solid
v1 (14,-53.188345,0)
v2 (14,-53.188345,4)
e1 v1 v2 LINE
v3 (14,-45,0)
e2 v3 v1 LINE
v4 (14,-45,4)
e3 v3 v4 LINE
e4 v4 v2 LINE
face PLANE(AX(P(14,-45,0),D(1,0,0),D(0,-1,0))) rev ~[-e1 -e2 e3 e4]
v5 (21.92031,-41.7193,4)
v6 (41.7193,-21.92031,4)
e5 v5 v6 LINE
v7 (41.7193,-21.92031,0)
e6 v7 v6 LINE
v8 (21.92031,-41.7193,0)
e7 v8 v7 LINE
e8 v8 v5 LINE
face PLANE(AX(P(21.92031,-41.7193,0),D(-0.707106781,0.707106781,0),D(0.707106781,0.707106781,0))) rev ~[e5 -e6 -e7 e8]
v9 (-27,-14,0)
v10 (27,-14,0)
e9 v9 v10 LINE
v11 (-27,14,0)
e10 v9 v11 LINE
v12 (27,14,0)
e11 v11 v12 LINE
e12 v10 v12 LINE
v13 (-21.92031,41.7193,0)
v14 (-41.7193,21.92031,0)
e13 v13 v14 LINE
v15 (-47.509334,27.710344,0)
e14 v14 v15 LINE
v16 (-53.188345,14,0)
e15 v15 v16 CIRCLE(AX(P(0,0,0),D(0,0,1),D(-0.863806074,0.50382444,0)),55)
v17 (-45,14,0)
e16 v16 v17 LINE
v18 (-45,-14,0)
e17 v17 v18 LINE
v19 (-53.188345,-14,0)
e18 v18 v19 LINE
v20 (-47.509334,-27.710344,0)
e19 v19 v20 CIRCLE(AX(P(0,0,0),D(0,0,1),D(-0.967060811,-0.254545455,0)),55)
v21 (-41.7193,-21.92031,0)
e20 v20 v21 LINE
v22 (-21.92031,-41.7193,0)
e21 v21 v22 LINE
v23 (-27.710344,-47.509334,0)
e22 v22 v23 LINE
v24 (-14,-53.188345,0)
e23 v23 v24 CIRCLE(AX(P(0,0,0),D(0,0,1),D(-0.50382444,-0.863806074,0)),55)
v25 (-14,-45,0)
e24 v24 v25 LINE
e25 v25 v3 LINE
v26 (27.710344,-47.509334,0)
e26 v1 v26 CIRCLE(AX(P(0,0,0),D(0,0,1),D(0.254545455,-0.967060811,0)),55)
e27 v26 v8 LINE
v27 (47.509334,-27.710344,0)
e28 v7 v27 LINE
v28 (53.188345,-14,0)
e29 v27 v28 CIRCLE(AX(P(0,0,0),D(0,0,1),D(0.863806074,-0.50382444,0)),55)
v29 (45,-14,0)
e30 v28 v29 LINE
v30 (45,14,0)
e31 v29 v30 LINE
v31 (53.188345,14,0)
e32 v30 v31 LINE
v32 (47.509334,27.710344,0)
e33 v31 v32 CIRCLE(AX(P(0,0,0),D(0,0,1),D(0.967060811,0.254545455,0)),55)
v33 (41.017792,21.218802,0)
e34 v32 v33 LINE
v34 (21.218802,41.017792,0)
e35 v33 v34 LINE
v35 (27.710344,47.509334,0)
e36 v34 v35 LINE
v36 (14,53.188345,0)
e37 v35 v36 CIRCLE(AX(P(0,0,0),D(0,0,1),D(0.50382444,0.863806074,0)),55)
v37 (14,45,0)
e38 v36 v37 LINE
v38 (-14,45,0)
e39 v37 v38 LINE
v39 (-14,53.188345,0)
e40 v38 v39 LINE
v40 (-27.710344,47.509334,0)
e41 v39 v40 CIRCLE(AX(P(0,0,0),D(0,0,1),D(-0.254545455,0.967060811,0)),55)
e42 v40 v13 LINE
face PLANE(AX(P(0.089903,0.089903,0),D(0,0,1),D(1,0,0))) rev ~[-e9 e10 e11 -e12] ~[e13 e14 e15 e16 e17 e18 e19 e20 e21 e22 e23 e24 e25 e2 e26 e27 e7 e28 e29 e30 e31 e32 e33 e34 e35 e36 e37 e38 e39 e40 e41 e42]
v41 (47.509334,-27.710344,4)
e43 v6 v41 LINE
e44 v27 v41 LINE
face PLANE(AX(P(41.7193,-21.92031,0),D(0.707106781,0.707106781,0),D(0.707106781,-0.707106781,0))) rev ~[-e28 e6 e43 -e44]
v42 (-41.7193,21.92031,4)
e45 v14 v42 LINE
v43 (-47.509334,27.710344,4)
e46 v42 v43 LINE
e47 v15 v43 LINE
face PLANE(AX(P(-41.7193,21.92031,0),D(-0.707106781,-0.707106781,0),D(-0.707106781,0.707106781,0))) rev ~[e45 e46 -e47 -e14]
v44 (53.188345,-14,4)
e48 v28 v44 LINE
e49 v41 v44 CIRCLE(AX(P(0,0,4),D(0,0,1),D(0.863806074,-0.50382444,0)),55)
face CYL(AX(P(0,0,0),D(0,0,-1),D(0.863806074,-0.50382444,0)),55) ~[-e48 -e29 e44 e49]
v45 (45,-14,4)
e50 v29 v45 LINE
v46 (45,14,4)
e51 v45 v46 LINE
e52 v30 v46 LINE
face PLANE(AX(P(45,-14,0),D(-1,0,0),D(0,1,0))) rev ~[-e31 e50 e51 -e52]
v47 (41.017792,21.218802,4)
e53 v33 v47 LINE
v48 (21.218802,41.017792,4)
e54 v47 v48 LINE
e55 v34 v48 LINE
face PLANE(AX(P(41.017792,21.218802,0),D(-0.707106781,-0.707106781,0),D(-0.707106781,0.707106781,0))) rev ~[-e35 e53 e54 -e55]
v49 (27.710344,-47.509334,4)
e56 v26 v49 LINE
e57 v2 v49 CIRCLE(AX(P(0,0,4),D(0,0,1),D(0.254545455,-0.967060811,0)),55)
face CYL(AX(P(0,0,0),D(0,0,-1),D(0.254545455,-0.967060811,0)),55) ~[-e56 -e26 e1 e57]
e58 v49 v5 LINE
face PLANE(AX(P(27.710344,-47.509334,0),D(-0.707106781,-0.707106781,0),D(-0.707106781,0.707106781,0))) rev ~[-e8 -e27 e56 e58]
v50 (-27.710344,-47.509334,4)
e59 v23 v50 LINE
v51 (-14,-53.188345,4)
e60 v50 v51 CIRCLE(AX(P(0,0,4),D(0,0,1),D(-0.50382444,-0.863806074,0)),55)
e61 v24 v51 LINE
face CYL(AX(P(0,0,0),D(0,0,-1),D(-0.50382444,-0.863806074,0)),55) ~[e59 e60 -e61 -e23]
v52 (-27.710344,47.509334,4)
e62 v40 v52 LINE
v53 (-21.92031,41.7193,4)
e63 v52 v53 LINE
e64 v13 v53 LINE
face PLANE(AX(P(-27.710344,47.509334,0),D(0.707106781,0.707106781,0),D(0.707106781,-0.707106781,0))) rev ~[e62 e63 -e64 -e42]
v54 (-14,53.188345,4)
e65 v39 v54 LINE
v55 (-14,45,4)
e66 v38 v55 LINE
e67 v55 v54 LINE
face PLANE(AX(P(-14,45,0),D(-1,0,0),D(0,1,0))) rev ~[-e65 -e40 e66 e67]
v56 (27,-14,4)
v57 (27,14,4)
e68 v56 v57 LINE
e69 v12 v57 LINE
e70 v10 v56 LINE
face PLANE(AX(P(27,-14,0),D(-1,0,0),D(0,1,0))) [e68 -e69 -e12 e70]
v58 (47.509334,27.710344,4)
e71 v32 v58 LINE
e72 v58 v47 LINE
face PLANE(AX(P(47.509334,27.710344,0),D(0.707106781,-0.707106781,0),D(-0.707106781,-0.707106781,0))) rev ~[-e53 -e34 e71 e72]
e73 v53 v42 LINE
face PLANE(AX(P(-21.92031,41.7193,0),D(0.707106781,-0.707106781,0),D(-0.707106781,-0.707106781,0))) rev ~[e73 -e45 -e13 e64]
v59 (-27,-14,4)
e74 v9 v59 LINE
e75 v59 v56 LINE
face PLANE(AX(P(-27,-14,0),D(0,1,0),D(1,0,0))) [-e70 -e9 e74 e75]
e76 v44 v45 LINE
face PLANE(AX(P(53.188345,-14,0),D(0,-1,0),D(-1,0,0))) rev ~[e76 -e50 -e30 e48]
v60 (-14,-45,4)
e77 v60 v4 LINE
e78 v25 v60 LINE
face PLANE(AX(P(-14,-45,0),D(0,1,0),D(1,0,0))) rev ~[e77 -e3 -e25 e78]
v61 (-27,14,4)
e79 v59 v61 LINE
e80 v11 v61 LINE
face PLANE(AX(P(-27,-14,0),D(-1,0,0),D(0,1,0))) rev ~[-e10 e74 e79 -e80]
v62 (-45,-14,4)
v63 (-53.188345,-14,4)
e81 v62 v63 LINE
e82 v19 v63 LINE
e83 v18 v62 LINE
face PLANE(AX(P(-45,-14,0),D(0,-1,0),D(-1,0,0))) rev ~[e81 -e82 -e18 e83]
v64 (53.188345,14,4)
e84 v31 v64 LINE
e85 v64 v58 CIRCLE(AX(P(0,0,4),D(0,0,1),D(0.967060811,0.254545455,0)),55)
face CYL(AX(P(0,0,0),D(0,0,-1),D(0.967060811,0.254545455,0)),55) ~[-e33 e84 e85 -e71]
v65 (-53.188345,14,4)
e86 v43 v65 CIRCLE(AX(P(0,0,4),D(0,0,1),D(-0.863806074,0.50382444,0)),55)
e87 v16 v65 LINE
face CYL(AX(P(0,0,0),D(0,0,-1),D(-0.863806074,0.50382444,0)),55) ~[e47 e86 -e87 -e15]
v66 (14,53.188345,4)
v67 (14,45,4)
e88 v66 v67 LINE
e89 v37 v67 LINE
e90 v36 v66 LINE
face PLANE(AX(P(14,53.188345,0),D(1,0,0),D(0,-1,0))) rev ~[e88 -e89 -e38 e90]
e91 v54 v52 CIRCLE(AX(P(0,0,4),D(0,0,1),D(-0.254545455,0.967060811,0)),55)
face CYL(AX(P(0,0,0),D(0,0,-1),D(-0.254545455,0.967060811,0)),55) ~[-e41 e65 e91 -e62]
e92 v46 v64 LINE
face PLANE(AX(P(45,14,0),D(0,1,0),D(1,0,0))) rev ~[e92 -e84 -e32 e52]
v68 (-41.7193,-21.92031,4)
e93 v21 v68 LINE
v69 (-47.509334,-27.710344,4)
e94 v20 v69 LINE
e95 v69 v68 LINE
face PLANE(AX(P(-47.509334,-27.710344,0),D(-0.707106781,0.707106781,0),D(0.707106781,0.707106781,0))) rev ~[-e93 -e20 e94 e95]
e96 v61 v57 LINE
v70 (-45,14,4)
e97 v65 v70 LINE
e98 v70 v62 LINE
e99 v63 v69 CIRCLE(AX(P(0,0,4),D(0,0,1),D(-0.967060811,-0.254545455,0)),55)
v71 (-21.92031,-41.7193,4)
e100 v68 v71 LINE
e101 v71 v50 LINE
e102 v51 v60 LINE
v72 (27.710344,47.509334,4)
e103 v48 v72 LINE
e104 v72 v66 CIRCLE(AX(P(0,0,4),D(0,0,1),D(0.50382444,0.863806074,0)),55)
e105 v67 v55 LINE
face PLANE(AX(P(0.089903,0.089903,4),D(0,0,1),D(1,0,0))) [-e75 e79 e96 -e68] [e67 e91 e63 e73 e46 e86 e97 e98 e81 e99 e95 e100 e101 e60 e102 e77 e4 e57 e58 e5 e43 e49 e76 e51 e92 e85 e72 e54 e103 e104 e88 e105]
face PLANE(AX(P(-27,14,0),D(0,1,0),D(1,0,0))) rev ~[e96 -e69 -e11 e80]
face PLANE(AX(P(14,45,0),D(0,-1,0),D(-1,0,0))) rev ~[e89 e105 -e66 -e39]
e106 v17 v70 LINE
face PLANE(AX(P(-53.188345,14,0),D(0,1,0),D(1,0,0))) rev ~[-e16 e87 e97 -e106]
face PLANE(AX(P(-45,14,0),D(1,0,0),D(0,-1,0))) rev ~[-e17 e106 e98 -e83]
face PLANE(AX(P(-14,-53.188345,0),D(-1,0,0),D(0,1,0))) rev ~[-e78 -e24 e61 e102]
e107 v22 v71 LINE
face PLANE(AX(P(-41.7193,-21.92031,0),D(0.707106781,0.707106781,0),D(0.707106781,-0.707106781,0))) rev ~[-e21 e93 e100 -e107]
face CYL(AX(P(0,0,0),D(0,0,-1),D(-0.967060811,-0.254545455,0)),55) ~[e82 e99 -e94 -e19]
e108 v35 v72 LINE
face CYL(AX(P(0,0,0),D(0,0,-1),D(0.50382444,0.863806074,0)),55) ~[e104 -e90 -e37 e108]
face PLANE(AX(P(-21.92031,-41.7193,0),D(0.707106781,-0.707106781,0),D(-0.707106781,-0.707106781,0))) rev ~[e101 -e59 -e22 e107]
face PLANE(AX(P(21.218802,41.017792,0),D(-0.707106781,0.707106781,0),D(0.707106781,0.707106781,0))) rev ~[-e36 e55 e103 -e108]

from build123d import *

# Parameters (mm, degrees)
F0_W     = 54
F0_H     = 28
F1_DEPTH = 4


# Not quite as in the source:
# - a feature of the source that left no trace in its solid (it failed there, or was rolled back) is left out


with BuildPart() as f1:
    # F0 (on Top) → F1 (new body)
    with BuildSketch(Plane.XY):
        with BuildLine():
            Line((14, -45), (14, -53.1883445879))
            ThreePointArc((14, -53.1883445879), (21.0475887801, -50.8133742881), (27.7103442016, -47.5093340748))
            Line((27.7103442016, -47.5093340748), (21.9203102168, -41.71930009))
            Line((21.9203102168, -41.71930009), (41.71930009, -21.9203102168))
            Line((41.71930009, -21.9203102168), (47.5093340748, -27.7103442016))
            ThreePointArc((47.5093340748, -27.7103442016), (50.8133742881, -21.0475887801), (53.1883445879, -14))
            Line((53.1883445879, -14), (45, -14))
            Line((45, -14), (45, 14))
            Line((45, 14), (53.1883445879, 14))
            ThreePointArc((53.1883445879, 14), (50.8133742881, 21.0475887801), (47.5093340748, 27.7103442016))
            Line((47.5093340748, 27.7103442016), (41.0177921349, 21.2188022616))
            Line((41.0177921349, 21.2188022616), (21.2188022616, 41.0177921349))
            Line((21.2188022616, 41.0177921349), (27.7103442016, 47.5093340748))
            ThreePointArc((27.7103442016, 47.5093340748), (21.0475887801, 50.8133742881), (14, 53.1883445879))
            Line((14, 53.1883445879), (14, 45))
            Line((14, 45), (-14, 45))
            Line((-14, 45), (-14, 53.1883445879))
            ThreePointArc((-14, 53.1883445879), (-21.0475887801, 50.8133742881), (-27.7103442016, 47.5093340748))
            Line((-27.7103442016, 47.5093340748), (-21.9203102168, 41.71930009))
            Line((-21.9203102168, 41.71930009), (-41.71930009, 21.9203102168))
            Line((-41.71930009, 21.9203102168), (-47.5093340748, 27.7103442016))
            ThreePointArc((-47.5093340748, 27.7103442016), (-50.8133742881, 21.0475887801), (-53.1883445879, 14))
            Line((-53.1883445879, 14), (-45, 14))
            Line((-45, 14), (-45, -14))
            Line((-45, -14), (-53.1883445879, -14))
            ThreePointArc((-53.1883445879, -14), (-50.8133742881, -21.0475887801), (-47.5093340748, -27.7103442016))
            Line((-47.5093340748, -27.7103442016), (-41.71930009, -21.9203102168))
            Line((-41.71930009, -21.9203102168), (-21.9203102168, -41.71930009))
            Line((-21.9203102168, -41.71930009), (-27.7103442016, -47.5093340748))
            ThreePointArc((-27.7103442016, -47.5093340748), (-21.0475887801, -50.8133742881), (-14, -53.1883445879))
            Line((-14, -53.1883445879), (-14, -45))
            Line((-14, -45), (14, -45))
        make_face()
        Rectangle(F0_W, F0_H, mode=Mode.SUBTRACT)
    extrude(amount=F1_DEPTH)


solid = f1.part
